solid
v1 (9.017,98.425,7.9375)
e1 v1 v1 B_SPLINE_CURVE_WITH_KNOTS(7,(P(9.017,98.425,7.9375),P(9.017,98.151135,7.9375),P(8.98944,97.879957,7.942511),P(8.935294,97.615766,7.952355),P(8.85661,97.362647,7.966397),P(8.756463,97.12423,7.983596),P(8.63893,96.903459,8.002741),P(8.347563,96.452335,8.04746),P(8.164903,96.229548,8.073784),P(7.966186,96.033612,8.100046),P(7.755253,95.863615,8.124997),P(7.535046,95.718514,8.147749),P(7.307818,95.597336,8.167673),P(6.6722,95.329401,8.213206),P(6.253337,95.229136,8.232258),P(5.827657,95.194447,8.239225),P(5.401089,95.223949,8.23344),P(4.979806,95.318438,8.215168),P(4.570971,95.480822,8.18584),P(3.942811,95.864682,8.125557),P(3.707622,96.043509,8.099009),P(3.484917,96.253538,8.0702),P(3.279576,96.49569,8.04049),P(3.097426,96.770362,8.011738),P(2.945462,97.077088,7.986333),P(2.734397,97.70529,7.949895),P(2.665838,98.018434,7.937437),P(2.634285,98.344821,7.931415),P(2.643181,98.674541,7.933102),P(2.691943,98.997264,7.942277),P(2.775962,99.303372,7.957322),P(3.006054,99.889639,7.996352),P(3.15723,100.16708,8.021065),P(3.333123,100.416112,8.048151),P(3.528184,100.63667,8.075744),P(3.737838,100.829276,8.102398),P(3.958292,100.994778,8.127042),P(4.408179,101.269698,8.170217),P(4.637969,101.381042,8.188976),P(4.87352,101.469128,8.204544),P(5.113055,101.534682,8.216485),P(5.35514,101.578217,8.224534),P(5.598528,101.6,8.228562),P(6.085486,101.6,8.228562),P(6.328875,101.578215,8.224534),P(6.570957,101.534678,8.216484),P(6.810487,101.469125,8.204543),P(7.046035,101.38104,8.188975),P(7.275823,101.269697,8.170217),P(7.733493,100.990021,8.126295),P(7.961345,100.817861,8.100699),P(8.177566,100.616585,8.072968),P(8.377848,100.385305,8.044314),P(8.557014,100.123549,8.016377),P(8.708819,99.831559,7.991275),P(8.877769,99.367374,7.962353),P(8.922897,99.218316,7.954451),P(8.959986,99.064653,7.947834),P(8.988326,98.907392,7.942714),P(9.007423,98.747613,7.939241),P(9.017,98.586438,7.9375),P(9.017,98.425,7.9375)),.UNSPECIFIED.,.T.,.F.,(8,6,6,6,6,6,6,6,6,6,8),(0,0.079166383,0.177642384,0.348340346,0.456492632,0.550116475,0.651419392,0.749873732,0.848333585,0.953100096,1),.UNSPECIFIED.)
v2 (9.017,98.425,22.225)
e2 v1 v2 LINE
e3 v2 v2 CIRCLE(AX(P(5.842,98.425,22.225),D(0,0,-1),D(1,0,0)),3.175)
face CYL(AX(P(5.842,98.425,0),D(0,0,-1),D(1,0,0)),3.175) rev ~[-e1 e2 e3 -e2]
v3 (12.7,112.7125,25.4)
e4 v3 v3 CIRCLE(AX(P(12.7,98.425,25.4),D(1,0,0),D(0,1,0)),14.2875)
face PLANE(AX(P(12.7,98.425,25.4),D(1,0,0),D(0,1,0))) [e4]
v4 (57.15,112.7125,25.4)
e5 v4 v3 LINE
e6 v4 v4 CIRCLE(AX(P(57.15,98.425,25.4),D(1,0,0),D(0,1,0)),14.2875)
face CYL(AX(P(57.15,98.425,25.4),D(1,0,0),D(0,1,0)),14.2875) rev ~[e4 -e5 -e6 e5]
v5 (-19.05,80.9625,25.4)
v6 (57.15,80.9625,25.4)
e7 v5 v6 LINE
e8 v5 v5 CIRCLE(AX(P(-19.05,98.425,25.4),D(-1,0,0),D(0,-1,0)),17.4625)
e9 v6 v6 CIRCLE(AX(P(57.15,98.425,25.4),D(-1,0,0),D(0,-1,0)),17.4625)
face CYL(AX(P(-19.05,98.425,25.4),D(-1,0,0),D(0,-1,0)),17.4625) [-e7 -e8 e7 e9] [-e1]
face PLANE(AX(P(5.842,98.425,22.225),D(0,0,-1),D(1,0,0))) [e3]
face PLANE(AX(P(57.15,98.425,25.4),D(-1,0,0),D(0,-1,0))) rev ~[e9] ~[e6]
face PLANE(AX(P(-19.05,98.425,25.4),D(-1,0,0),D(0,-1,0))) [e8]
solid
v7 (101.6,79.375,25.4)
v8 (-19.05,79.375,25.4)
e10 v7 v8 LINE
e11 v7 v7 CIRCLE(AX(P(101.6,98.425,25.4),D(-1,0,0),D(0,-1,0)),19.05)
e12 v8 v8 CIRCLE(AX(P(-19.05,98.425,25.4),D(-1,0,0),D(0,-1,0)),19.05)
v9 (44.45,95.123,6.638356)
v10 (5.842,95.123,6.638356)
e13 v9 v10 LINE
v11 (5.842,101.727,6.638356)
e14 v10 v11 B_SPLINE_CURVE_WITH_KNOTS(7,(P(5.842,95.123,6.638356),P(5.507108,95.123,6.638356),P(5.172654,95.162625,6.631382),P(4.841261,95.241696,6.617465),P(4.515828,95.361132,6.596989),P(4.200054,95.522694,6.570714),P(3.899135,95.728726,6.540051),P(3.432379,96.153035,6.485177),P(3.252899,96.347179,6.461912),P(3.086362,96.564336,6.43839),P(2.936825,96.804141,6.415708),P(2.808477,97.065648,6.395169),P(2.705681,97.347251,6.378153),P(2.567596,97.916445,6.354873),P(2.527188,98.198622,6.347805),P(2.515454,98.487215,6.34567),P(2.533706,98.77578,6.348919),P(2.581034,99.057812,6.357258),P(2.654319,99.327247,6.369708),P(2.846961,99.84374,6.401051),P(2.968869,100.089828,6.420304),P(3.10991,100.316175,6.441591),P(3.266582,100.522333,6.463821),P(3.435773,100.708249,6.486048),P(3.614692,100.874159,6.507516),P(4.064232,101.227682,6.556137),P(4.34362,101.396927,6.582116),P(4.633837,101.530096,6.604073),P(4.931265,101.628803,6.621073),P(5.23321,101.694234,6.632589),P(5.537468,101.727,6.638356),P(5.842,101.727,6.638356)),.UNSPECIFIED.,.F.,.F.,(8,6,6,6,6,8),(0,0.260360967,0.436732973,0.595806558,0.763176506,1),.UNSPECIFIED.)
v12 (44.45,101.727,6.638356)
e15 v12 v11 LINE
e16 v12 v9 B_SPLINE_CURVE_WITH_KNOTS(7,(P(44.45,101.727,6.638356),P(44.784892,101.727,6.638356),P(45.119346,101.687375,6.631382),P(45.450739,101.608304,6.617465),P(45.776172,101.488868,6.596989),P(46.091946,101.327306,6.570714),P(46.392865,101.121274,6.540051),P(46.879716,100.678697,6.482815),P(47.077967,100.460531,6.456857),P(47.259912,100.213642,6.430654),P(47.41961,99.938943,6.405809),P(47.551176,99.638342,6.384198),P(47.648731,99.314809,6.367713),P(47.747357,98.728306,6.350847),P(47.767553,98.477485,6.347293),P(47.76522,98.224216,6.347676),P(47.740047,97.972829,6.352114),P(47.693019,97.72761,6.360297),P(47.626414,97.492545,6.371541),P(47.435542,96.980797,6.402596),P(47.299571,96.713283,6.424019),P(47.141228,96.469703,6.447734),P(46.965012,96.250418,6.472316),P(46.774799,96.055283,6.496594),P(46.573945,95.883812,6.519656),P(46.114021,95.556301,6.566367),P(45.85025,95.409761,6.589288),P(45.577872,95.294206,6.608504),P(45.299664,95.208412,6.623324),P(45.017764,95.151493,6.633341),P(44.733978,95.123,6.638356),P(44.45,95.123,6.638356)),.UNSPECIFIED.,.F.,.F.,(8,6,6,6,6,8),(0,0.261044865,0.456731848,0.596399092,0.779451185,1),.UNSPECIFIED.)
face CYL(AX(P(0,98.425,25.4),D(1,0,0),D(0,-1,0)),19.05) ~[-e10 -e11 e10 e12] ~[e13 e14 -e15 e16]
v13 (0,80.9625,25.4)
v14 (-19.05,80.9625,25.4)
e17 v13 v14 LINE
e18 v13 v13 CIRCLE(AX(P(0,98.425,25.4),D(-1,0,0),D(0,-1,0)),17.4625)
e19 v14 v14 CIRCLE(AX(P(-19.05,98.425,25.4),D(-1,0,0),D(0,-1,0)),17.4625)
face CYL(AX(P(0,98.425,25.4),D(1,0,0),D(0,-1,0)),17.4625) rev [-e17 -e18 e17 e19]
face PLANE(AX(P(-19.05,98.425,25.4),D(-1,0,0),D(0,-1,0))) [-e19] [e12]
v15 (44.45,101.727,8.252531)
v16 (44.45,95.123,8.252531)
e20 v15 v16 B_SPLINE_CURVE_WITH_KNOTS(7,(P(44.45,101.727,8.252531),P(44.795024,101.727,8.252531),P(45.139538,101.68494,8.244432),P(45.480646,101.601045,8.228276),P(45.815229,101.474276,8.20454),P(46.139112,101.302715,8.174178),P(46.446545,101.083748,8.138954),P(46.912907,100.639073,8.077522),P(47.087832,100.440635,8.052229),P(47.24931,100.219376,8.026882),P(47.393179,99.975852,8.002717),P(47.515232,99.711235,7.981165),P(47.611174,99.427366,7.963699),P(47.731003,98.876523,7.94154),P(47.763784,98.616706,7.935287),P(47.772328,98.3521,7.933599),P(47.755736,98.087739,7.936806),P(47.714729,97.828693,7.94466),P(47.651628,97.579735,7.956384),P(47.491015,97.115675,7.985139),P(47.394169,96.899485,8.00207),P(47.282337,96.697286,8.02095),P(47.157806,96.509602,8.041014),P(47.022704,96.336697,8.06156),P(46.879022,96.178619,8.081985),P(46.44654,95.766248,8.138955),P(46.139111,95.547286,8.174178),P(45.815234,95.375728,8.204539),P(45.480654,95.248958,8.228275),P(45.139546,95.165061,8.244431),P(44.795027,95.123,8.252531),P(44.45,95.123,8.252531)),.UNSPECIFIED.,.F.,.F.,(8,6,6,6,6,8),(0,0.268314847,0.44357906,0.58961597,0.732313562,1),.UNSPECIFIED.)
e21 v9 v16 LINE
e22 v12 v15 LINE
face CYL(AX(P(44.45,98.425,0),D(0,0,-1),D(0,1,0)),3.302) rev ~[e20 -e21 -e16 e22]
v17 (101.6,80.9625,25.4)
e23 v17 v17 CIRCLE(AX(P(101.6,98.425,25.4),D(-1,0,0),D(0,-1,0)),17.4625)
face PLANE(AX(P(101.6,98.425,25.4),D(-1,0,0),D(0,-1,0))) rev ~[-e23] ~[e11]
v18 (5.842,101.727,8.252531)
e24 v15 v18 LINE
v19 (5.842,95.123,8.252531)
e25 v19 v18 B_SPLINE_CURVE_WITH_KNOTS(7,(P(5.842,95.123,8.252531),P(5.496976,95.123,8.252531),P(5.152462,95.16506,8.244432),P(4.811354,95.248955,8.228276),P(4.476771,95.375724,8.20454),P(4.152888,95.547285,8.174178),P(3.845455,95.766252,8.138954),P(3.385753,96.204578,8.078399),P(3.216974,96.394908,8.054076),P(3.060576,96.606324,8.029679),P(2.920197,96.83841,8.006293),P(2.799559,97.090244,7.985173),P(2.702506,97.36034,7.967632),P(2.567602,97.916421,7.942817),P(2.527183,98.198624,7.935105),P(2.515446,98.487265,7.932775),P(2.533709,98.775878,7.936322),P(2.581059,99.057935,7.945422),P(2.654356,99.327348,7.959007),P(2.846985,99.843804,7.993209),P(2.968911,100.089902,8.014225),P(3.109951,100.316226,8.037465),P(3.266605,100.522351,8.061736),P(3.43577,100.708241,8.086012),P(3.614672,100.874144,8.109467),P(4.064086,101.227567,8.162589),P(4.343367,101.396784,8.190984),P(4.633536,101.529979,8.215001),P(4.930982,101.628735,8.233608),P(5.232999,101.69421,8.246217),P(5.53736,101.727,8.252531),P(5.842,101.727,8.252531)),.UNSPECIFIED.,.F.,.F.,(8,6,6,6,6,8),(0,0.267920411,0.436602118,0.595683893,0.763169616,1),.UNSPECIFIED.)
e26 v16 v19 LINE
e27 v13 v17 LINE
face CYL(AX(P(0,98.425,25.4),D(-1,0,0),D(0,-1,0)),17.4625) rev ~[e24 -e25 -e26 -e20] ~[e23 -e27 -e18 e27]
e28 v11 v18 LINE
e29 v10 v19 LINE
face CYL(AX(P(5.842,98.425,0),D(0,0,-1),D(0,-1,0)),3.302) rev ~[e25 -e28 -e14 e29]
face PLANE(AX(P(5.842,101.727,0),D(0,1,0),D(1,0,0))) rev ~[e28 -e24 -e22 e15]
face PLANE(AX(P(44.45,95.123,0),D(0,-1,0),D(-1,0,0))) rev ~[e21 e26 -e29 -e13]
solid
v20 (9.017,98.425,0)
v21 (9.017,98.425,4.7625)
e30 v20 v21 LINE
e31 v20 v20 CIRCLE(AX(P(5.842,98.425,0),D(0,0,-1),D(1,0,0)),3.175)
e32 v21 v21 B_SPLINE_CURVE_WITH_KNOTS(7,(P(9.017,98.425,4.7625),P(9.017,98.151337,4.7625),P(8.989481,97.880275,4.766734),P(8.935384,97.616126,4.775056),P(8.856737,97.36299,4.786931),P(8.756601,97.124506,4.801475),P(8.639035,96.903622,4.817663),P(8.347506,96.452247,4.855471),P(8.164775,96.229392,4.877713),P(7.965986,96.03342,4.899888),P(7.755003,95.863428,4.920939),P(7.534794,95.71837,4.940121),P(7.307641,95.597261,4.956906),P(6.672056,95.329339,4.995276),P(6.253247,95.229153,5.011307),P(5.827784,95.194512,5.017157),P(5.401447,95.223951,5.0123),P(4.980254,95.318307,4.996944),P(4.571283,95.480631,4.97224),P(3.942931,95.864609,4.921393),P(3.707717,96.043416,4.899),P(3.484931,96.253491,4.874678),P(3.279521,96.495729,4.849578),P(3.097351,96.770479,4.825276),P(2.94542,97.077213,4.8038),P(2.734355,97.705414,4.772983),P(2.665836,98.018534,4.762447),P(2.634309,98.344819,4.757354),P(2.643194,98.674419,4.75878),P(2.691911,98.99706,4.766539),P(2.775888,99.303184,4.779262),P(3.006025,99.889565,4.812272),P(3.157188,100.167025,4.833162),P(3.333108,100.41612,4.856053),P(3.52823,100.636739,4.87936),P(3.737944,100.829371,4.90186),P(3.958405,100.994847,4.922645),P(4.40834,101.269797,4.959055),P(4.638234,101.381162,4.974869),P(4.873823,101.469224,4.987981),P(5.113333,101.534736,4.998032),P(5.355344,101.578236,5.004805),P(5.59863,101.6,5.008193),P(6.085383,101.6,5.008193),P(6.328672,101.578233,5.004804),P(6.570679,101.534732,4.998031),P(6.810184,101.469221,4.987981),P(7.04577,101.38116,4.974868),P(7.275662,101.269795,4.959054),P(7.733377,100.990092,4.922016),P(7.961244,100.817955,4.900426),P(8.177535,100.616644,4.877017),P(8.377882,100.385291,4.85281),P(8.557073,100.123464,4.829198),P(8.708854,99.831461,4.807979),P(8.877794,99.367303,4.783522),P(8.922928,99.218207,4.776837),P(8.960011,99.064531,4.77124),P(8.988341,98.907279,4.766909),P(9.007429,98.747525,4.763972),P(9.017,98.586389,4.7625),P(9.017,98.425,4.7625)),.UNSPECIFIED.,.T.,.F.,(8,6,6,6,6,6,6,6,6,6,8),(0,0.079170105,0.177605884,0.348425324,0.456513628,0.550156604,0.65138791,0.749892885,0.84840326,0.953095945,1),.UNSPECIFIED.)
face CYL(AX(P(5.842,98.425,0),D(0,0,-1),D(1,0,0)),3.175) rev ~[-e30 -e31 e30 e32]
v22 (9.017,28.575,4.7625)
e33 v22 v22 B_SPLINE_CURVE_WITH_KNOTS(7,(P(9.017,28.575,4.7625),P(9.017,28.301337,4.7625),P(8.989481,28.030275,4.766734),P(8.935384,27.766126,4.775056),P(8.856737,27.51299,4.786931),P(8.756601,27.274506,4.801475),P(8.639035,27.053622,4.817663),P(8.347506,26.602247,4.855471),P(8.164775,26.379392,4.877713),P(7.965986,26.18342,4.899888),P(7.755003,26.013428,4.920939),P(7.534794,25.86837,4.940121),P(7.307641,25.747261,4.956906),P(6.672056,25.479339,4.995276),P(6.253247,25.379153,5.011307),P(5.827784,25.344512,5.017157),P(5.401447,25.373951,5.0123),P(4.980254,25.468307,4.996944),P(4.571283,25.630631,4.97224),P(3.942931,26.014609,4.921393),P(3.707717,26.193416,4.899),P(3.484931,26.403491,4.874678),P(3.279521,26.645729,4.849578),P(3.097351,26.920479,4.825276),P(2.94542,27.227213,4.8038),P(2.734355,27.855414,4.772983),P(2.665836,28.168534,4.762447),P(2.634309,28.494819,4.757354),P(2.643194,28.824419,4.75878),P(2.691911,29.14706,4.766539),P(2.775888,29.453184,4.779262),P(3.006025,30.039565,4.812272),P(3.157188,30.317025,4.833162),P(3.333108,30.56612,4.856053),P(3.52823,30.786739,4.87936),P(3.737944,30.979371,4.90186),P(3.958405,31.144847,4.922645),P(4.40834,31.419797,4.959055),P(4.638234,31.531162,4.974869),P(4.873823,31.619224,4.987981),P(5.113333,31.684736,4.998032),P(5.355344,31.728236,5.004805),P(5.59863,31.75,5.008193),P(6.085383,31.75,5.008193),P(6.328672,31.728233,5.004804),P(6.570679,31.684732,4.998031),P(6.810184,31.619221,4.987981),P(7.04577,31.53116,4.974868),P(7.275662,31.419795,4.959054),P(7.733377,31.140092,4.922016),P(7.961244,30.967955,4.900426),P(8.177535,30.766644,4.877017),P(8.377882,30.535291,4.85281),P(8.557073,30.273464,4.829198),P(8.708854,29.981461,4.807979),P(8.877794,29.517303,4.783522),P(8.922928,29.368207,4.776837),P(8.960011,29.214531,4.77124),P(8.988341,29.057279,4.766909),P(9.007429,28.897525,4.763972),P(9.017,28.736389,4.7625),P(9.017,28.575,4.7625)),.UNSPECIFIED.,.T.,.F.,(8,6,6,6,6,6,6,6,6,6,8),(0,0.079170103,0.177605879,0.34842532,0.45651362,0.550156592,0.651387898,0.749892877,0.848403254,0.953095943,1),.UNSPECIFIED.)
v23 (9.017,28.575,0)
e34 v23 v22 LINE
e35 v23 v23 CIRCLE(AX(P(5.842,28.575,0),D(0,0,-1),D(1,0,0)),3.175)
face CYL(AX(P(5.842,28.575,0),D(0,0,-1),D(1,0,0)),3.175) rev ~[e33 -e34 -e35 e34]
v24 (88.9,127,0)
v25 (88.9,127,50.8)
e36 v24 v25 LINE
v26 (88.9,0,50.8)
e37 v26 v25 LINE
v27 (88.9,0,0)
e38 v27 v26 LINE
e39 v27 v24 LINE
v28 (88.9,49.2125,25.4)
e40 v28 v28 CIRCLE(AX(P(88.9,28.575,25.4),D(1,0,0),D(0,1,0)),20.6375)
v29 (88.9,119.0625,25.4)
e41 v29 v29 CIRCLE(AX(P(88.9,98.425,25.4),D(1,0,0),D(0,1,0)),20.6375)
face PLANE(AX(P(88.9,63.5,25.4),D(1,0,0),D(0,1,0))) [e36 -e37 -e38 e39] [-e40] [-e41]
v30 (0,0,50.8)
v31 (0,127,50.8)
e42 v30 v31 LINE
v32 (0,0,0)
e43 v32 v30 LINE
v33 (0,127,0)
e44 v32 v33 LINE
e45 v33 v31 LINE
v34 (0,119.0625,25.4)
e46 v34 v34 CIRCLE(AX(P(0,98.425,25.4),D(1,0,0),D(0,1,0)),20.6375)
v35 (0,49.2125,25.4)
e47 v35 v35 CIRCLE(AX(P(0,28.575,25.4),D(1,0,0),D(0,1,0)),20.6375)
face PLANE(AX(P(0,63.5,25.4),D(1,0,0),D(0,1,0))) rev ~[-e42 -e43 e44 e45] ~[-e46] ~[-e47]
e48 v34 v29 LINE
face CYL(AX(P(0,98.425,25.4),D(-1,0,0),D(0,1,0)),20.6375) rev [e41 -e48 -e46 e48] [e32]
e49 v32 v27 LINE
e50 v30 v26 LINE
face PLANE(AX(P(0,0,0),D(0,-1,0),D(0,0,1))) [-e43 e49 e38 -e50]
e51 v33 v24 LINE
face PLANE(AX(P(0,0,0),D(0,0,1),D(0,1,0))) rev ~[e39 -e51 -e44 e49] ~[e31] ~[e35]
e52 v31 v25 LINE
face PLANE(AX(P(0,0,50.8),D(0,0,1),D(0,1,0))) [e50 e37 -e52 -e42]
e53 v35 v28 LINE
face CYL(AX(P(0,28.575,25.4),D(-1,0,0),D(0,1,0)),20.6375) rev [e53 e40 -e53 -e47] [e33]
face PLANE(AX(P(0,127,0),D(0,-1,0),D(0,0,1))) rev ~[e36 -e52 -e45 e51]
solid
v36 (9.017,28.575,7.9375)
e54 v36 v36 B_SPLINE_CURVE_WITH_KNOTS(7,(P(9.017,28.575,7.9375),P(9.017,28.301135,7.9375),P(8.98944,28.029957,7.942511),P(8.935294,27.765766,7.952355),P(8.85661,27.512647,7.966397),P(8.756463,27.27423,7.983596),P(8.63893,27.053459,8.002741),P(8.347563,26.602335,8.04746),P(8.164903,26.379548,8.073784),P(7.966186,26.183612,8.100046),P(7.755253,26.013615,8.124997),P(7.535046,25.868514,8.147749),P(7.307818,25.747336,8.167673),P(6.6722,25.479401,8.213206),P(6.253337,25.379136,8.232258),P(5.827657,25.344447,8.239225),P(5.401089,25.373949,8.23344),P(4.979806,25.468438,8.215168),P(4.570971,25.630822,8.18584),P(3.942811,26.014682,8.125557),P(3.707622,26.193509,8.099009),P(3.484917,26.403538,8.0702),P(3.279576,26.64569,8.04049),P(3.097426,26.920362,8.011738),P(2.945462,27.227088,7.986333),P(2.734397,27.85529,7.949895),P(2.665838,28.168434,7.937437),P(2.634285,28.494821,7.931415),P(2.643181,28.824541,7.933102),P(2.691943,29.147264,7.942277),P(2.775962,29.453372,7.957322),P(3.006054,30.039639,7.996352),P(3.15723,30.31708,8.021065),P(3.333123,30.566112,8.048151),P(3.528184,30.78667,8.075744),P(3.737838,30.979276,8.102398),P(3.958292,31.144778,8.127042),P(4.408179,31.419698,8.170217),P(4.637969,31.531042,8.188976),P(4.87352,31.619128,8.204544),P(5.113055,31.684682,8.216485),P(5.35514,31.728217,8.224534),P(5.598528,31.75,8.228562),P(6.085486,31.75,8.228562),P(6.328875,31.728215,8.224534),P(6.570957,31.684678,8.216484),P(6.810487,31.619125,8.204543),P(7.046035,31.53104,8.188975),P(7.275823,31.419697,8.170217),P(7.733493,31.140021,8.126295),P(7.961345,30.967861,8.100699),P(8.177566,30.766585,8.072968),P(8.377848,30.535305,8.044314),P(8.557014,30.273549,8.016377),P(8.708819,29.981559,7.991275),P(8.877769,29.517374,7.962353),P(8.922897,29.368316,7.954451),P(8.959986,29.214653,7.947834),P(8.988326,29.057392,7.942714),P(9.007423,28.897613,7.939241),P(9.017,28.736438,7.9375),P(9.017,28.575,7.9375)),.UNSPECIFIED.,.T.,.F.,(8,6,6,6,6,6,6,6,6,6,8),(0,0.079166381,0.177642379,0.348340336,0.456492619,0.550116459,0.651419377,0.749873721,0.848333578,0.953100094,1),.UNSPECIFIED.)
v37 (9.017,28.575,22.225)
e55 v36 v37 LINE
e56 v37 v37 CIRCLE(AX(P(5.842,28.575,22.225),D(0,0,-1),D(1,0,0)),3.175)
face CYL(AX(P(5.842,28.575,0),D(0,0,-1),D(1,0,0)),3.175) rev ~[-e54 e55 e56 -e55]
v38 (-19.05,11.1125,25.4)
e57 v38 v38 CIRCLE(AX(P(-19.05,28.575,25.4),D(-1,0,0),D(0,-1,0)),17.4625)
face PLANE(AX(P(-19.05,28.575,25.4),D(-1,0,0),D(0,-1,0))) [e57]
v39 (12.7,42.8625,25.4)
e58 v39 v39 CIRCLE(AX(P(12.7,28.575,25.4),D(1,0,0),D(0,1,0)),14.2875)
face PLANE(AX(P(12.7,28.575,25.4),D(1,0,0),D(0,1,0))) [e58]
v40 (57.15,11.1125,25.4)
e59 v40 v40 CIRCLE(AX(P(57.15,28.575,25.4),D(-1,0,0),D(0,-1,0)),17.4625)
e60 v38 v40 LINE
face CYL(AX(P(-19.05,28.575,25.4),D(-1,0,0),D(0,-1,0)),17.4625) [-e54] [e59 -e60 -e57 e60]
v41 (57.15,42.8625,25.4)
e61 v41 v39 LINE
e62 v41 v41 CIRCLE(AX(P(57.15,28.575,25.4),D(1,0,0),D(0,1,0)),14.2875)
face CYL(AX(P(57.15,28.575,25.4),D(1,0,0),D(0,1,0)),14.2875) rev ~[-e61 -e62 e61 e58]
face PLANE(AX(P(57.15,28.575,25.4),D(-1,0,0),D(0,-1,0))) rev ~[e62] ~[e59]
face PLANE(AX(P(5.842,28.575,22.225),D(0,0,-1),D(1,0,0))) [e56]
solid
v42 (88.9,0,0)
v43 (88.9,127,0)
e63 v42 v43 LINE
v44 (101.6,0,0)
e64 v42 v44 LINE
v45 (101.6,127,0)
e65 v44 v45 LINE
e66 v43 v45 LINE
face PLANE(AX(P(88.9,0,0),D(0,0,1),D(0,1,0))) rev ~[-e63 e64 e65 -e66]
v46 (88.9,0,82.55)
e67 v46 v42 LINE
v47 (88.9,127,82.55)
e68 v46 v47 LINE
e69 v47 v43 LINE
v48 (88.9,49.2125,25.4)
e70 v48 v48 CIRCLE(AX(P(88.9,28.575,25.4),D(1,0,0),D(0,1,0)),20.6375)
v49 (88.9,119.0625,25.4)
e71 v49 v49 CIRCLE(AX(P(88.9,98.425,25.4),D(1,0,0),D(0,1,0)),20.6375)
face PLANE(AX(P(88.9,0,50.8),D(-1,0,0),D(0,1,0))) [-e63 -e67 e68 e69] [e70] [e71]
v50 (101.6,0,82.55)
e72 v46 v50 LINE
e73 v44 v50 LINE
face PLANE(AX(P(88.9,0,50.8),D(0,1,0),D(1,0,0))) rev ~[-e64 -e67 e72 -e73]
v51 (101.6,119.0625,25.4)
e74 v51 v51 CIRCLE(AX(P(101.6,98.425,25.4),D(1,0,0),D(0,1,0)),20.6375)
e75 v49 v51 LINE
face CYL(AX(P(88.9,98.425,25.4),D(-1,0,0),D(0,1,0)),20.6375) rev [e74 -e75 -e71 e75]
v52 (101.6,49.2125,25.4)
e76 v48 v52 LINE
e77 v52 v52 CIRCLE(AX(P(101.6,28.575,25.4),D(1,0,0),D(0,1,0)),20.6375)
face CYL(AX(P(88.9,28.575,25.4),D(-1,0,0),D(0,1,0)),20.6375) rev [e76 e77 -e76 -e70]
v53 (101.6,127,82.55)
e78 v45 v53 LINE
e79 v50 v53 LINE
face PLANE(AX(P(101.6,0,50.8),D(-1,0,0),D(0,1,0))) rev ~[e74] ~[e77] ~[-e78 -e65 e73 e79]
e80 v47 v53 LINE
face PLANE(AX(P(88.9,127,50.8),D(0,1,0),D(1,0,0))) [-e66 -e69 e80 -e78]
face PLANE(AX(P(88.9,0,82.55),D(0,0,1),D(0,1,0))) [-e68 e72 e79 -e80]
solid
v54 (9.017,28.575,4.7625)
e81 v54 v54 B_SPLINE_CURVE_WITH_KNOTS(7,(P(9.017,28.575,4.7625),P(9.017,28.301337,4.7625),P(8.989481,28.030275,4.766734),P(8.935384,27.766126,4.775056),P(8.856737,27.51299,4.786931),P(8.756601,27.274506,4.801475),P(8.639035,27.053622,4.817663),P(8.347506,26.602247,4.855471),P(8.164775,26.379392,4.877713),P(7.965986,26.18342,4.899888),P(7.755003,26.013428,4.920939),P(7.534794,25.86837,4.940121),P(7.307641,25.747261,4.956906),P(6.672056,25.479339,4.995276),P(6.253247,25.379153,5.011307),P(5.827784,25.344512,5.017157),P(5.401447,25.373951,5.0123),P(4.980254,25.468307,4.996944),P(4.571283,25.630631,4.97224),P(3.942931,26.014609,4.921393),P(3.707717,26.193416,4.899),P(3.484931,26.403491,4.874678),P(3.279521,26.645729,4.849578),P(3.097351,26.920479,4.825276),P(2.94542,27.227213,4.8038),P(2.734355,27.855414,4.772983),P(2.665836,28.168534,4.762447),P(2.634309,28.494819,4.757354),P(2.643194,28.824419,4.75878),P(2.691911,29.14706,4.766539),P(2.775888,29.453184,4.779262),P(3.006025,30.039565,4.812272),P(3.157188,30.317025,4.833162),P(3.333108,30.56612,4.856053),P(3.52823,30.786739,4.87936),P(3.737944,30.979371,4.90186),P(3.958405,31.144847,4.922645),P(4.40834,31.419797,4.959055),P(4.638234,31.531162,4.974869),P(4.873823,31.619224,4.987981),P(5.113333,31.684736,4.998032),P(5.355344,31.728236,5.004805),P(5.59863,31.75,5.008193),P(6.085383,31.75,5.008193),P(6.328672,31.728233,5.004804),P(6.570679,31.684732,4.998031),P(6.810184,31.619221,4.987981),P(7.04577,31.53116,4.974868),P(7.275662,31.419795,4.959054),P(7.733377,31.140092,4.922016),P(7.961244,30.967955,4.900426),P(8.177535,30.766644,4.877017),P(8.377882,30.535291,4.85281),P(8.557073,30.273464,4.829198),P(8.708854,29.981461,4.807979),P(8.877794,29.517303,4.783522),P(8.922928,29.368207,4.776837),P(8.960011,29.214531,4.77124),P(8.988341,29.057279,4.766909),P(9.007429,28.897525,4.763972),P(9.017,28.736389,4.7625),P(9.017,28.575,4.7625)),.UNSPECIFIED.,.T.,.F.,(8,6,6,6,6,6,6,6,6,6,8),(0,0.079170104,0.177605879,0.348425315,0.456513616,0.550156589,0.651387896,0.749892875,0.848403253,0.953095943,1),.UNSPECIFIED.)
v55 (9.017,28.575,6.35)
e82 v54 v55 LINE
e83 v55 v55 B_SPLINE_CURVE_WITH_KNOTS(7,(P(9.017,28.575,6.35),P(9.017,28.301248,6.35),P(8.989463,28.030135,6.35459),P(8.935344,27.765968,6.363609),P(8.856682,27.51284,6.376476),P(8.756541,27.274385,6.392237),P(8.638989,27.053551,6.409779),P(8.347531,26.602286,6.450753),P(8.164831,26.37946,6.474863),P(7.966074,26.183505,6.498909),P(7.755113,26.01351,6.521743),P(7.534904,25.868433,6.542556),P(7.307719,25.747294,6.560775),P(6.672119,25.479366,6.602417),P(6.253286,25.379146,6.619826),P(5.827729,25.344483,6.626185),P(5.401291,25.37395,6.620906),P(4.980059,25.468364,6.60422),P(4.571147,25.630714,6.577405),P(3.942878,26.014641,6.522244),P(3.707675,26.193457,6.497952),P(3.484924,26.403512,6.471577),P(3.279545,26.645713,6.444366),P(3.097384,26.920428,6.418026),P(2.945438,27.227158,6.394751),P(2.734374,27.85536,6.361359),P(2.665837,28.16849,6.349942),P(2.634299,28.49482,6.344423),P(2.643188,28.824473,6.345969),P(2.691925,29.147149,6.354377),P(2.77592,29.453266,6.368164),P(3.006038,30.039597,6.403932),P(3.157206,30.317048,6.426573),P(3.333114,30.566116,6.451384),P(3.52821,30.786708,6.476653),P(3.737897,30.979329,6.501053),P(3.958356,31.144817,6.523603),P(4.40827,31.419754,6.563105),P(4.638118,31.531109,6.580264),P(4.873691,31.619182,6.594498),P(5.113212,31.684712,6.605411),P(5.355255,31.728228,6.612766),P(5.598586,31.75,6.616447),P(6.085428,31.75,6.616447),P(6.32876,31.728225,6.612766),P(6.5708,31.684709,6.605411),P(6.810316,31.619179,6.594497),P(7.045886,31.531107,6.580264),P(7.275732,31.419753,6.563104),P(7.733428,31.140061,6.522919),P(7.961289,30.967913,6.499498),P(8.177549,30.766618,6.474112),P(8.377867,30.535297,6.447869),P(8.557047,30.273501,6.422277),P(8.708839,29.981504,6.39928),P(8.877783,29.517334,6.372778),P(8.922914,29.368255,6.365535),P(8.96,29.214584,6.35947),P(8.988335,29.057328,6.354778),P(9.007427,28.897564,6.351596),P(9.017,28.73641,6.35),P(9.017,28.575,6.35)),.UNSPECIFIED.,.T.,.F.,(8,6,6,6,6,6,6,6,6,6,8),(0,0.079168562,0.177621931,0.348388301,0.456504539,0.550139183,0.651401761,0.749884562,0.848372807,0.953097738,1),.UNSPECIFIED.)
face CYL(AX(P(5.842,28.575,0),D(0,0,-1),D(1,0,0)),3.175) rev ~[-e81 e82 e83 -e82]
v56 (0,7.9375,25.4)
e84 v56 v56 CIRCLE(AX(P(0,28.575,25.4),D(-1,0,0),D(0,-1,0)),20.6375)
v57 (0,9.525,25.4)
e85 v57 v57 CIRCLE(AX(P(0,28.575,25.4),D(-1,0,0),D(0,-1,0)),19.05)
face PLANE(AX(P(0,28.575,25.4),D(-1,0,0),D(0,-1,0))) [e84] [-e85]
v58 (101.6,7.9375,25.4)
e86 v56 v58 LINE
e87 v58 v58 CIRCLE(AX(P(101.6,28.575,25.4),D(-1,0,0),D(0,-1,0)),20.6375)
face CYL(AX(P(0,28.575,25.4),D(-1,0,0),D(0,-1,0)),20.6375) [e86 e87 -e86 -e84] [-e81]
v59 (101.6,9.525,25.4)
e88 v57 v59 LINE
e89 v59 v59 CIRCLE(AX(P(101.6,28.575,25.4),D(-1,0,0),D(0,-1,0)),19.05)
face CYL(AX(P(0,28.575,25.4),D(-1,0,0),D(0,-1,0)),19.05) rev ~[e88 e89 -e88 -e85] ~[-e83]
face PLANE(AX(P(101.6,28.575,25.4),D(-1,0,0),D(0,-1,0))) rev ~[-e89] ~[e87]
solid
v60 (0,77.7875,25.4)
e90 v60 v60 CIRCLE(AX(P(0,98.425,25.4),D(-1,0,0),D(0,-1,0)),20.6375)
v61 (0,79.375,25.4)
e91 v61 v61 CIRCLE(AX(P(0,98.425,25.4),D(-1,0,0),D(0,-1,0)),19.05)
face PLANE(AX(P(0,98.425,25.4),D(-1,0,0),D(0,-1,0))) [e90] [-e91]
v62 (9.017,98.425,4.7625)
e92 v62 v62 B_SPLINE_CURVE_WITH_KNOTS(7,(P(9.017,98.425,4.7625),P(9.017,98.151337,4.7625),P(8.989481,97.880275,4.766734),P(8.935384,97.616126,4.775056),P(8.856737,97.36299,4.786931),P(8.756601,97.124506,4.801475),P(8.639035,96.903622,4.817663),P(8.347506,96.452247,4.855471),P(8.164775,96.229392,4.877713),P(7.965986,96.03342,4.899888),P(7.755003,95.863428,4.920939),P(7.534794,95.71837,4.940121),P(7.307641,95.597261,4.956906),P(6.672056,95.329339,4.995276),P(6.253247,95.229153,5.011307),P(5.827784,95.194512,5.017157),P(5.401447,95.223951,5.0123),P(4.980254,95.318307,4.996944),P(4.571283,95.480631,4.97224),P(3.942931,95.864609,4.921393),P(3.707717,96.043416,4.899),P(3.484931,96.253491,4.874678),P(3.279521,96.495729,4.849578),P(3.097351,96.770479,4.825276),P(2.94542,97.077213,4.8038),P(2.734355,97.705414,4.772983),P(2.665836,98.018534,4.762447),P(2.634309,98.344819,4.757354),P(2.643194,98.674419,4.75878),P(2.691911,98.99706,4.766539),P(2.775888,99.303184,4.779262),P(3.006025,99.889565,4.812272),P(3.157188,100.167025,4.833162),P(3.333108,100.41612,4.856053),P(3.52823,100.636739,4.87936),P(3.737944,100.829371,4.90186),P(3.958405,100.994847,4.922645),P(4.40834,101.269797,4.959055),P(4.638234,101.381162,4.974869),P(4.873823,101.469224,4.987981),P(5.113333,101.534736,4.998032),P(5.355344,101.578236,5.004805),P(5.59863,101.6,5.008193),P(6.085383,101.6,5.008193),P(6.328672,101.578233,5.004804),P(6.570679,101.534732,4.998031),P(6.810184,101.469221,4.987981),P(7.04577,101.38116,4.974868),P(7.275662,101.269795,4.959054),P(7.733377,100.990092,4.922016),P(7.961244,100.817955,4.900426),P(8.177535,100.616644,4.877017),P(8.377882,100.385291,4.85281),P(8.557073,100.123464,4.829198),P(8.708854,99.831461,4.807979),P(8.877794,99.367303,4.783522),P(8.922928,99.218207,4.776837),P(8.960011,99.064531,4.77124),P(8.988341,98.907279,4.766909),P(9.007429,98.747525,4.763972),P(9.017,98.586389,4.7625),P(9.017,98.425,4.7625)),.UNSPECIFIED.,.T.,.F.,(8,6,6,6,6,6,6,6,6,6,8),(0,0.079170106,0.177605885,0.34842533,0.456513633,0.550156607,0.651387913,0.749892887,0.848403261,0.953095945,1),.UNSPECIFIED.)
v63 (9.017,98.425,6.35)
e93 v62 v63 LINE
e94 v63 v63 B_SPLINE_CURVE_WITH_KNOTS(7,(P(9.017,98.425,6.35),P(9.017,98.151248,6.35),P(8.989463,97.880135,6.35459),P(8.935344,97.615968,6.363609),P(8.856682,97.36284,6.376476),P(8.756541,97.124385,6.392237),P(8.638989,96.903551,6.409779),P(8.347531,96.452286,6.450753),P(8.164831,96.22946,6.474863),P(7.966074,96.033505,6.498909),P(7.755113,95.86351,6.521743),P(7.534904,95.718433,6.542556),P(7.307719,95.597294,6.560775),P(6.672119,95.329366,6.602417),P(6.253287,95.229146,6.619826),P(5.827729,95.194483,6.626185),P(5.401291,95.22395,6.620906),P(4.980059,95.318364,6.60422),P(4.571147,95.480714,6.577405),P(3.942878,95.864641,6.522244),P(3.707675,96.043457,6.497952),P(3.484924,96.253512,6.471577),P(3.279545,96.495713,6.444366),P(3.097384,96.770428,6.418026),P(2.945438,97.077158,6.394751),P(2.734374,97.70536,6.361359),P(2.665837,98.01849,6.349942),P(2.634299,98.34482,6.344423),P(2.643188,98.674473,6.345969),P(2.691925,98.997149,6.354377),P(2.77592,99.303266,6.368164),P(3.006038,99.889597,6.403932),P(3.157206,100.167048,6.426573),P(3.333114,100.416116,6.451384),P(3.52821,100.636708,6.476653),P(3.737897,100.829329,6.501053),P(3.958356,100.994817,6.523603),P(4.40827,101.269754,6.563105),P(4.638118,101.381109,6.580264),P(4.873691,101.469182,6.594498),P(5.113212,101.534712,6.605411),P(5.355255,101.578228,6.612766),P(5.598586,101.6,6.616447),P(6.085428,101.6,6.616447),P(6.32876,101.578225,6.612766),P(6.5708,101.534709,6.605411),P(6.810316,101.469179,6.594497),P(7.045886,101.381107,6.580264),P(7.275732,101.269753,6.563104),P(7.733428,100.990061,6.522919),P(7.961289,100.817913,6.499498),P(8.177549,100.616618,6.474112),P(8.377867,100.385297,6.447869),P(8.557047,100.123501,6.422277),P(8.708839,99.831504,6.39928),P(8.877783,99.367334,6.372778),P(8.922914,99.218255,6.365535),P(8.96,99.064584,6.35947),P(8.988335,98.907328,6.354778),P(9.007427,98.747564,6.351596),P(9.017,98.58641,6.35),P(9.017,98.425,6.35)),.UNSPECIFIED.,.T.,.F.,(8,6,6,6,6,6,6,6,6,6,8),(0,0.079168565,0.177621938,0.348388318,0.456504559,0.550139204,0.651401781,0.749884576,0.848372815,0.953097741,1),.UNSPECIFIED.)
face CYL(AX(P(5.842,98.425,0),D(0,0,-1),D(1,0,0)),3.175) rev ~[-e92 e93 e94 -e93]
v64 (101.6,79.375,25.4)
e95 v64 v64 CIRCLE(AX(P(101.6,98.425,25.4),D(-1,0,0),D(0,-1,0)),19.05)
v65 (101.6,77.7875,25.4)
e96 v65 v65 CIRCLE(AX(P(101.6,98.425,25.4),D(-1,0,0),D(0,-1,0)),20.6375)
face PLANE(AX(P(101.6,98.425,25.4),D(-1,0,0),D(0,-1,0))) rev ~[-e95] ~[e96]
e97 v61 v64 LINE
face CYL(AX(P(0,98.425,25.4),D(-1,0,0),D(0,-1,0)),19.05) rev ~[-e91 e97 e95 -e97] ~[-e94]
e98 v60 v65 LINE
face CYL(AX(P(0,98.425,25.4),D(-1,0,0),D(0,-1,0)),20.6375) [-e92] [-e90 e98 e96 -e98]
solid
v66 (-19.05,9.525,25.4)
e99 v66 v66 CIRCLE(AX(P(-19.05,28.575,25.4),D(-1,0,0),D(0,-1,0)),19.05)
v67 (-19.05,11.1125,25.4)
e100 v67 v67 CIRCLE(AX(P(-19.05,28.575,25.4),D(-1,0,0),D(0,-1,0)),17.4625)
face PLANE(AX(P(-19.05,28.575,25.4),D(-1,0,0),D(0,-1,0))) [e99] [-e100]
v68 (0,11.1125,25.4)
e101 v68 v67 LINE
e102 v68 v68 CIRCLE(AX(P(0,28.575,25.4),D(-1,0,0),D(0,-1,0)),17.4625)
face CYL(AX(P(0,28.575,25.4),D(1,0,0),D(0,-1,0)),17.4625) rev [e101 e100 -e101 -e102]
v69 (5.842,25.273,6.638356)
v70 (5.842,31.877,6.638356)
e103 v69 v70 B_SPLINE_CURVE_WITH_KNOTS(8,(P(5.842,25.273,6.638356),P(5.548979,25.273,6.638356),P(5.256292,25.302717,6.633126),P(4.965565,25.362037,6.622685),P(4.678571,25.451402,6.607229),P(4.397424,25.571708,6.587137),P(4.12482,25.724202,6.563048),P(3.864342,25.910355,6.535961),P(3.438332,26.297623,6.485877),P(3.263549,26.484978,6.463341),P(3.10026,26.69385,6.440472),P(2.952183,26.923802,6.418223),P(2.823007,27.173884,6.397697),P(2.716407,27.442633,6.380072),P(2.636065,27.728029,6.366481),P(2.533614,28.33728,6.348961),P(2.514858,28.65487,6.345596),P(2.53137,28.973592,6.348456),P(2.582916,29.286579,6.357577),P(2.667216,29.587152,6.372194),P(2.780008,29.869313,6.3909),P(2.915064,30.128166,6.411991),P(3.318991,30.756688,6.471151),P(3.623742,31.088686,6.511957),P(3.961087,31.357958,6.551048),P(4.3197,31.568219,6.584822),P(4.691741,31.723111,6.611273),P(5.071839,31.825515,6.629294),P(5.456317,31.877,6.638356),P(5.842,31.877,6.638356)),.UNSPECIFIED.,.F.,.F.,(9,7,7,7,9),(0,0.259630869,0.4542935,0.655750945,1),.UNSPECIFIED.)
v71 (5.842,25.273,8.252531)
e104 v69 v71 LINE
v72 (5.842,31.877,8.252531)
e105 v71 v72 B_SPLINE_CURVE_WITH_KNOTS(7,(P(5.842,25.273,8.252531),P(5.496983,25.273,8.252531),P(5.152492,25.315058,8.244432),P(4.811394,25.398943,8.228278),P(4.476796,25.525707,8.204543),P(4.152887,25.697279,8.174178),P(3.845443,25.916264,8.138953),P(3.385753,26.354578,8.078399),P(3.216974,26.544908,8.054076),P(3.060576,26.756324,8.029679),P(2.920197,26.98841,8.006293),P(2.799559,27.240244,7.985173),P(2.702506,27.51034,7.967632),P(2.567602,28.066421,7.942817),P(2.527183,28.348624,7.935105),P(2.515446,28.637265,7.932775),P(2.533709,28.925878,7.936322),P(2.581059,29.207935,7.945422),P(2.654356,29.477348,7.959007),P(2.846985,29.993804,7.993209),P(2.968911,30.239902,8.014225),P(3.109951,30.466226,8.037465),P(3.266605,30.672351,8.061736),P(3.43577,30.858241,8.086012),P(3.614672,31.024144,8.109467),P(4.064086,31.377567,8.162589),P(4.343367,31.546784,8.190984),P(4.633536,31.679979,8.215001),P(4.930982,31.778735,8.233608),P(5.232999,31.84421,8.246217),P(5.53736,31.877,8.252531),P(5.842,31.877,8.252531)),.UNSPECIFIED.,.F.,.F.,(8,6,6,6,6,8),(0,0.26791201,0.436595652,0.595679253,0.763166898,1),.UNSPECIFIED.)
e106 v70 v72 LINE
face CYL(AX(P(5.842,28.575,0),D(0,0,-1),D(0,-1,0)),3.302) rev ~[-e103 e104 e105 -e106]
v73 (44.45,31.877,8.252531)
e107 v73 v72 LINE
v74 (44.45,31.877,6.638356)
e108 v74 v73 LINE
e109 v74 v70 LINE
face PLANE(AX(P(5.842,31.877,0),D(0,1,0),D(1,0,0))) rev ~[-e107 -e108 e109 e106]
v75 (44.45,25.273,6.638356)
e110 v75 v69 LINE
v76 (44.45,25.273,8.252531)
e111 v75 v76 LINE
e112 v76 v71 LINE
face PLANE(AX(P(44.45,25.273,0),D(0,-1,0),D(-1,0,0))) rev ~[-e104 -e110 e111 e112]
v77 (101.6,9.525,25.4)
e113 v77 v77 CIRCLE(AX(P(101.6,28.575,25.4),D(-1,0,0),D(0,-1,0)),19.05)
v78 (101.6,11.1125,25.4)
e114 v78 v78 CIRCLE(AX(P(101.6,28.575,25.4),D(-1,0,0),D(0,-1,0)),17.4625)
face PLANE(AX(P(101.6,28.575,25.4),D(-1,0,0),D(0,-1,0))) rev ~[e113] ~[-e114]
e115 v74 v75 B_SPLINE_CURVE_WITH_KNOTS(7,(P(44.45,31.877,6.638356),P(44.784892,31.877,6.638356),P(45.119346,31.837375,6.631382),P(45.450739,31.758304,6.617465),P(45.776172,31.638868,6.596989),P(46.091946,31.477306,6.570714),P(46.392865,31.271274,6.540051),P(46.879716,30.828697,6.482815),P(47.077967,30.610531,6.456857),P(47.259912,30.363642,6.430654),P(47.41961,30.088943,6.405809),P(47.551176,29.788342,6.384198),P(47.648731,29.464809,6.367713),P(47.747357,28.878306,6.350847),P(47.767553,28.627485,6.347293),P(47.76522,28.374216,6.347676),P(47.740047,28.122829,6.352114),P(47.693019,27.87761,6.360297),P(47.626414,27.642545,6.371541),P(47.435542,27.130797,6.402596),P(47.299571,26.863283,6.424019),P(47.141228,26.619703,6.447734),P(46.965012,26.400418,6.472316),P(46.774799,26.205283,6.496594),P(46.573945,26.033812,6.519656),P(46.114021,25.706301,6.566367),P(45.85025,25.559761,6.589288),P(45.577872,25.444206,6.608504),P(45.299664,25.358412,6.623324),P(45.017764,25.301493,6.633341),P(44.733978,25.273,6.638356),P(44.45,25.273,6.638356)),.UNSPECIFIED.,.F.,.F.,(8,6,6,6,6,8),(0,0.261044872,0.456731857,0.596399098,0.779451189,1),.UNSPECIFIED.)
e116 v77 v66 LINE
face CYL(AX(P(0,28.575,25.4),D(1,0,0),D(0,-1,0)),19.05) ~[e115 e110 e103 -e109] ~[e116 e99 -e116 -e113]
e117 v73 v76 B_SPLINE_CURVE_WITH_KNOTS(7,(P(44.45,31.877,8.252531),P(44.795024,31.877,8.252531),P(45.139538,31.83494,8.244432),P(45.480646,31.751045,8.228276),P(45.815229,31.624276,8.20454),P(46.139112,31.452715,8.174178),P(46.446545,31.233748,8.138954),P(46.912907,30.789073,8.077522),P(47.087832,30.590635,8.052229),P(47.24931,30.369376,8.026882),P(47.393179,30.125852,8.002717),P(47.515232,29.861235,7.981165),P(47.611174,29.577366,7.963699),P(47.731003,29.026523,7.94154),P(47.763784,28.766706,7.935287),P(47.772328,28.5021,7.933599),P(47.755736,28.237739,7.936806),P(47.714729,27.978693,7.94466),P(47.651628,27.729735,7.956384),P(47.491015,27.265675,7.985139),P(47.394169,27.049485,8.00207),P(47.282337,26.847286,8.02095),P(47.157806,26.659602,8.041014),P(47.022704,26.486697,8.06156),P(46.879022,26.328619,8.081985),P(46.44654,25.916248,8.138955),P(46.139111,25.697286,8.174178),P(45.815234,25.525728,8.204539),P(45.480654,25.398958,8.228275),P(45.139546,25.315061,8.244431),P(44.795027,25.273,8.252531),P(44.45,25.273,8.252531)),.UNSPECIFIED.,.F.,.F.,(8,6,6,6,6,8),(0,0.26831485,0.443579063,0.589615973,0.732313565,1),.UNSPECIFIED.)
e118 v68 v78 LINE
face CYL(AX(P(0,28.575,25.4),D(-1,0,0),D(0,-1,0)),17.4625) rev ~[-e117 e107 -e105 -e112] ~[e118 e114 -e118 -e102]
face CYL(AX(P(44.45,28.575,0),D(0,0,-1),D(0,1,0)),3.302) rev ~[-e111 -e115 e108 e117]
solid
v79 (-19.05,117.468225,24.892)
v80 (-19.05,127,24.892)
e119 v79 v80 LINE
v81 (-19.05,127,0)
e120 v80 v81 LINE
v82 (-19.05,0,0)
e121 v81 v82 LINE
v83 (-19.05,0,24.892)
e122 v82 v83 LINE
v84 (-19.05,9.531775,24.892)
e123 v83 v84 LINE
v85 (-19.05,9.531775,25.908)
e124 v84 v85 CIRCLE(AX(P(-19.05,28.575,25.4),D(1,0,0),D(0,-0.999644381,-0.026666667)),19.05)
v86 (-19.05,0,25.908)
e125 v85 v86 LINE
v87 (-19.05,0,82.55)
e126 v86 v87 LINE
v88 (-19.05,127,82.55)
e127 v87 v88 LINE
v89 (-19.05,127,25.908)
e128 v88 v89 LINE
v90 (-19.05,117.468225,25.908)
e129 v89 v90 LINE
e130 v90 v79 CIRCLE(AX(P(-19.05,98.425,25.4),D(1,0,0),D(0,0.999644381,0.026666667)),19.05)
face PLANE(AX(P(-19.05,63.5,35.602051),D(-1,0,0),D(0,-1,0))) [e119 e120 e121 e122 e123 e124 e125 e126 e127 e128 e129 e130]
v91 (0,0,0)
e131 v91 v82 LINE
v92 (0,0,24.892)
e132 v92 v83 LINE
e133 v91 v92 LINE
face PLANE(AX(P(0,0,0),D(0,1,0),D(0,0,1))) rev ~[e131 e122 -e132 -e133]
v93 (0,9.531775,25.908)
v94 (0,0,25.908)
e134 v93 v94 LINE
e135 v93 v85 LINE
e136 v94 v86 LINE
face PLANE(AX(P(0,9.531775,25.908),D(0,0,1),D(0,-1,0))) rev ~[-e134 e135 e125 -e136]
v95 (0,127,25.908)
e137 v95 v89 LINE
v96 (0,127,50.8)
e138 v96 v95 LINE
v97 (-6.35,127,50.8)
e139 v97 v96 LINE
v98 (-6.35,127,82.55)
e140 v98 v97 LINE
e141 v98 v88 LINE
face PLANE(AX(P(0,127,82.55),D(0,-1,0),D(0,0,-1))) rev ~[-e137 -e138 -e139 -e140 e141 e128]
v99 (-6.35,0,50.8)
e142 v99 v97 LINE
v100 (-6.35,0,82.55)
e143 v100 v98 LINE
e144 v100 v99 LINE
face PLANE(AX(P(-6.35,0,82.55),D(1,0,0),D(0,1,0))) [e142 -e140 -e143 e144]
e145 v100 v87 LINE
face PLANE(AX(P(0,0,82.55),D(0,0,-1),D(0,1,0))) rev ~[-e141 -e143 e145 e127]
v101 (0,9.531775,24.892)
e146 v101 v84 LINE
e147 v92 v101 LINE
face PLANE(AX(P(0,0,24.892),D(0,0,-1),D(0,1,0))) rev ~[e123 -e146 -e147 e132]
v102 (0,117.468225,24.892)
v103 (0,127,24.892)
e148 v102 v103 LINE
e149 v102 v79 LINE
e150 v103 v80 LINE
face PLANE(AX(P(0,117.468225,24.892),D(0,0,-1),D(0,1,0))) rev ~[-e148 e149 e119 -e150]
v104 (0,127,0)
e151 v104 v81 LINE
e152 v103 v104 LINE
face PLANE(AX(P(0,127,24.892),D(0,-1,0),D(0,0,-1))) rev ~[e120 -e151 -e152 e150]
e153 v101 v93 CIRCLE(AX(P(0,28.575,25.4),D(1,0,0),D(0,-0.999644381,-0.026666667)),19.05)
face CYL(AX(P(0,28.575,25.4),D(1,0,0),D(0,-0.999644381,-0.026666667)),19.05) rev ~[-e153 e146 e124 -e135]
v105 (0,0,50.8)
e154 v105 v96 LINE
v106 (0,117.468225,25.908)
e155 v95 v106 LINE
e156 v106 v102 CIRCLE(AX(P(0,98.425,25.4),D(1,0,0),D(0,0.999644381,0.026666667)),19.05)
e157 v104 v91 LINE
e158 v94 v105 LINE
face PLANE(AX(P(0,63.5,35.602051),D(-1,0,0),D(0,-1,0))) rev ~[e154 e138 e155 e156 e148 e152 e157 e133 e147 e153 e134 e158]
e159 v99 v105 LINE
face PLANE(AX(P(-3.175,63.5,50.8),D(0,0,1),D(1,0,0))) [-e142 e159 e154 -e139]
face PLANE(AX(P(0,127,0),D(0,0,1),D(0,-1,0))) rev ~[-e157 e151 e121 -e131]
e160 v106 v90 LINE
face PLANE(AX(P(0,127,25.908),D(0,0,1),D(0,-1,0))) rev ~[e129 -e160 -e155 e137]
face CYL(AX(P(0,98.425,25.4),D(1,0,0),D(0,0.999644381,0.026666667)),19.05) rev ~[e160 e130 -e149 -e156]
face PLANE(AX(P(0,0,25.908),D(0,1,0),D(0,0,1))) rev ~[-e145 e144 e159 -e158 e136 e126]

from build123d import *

# Parameters (mm, degrees)
F0_W          = 127
F0_H          = 50.8
F0_R          = 20.6375
F1_DEPTH      = 88.9
F2_R          = 20.6375
F2_R_2        = 19.05
F3_DEPTH      = 101.6
F4_DEPTH      = 12.7
F5_DEPTH      = 31.75
F6_R          = 19.05
F6_R_2        = 17.4625
F7_DEPTH      = 101.6
F7_DEPTH_BACK = 19.05
F9_DEPTH      = 19.05
F10_W         = 6.35
F10_H         = 127
F11_DEPTH     = 31.75
F12_R         = 17.4625
F13_DEPTH     = 76.2
F15_DEPTH     = 12.7
F16_R         = 3.175
F17_DEPTH     = 22.225
F18_R         = 14.2875
F19_DEPTH     = 44.45


with BuildPart() as f1:
    # F0 (on Right) → F1 (new body)
    with BuildSketch(Plane.YZ):
        with Locations((63.5, 25.4)):
            Rectangle(F0_W, F0_H)
        with Locations((28.575, 25.4)):
            Circle(F0_R, mode=Mode.SUBTRACT)
        with Locations((98.425, 25.4)):
            Circle(F0_R, mode=Mode.SUBTRACT)
    extrude(amount=F1_DEPTH)


with BuildPart() as f3:
    # F2 (on face) → F3 (new body)
    with BuildSketch(Plane(origin=(0, 0, 0), x_dir=(0, -1, 0), z_dir=(-1, 0, 0))):
        with Locations((-98.425, 25.4)):
            Circle(F2_R)
        with Locations((-98.425, 25.4)):
            Circle(F2_R_2, mode=Mode.SUBTRACT)
    extrude(amount=-F3_DEPTH)


with BuildPart() as f3b:
    # F2 (on face) → F3, piece 2 (new body)
    with BuildSketch(Plane(origin=(0, 0, 0), x_dir=(0, -1, 0), z_dir=(-1, 0, 0))):
        with Locations((-28.575, 25.4)):
            Circle(F2_R)
        with Locations((-28.575, 25.4)):
            Circle(F2_R_2, mode=Mode.SUBTRACT)
    extrude(amount=-F3_DEPTH)


with BuildPart() as f4:
    # F4 (new): a face of the model
    f4_faces = [f1.part.faces().sort_by_distance(p)[0] for p in [
        (88.9, 63.5, 25.4),
    ]]
    extrude(f4_faces, amount=F4_DEPTH)

    # F5 (add): a face of the model
    f5_faces = [f4.faces().sort_by_distance(p)[0] for p in [
        (95.25, 63.5, 50.8),
    ]]
    extrude(f5_faces, amount=F5_DEPTH)


with BuildPart() as f7:
    # F6 (on face) → F7 (new body, two sides)
    with BuildSketch(Plane(origin=(0, 0, 0), x_dir=(0, -1, 0), z_dir=(-1, 0, 0))) as f7_sk:
        with Locations((-98.425, 25.4)):
            Circle(F6_R)
        with Locations((-98.425, 25.4)):
            Circle(F6_R_2, mode=Mode.SUBTRACT)
    extrude(amount=-F7_DEPTH)
    extrude(f7_sk.sketch, amount=F7_DEPTH_BACK)


with BuildPart() as f7b:
    # F6 (on face) → F7, piece 2 (new body, two sides)
    with BuildSketch(Plane(origin=(0, 0, 0), x_dir=(0, -1, 0), z_dir=(-1, 0, 0))) as f7_2_sk:
        with Locations((-28.575, 25.4)):
            Circle(F6_R)
        with Locations((-28.575, 25.4)):
            Circle(F6_R_2, mode=Mode.SUBTRACT)
    extrude(amount=-F7_DEPTH)
    extrude(f7_2_sk.sketch, amount=F7_DEPTH_BACK)


with BuildPart() as f9:
    # F8 (on face) → F9 (new body)
    with BuildSketch(Plane(origin=(0, 0, 0), x_dir=(0, -1, 0), z_dir=(-1, 0, 0))):
        with BuildLine():
            Line((-127, 24.892), (-127, 0))
            Line((-127, 0), (0, 0))
            Line((0, 0), (0, 24.892))
            Line((0, 24.892), (-9.5317745379, 24.892))
            ThreePointArc((-9.5317745379, 24.892), (-47.625, 25.4), (-9.5317745379, 25.908))
            Line((-9.5317745379, 25.908), (0, 25.908))
            Line((0, 25.908), (0, 82.55))
            Line((0, 82.55), (-127, 82.55))
            Line((-127, 82.55), (-127, 25.908))
            Line((-127, 25.908), (-117.4682254621, 25.908))
            ThreePointArc((-117.4682254621, 25.908), (-79.375, 25.4), (-117.4682254621, 24.892))
            Line((-117.4682254621, 24.892), (-127, 24.892))
        make_face()
    extrude(amount=F9_DEPTH)

    # F10 (on face) → F11 (cut)
    with BuildSketch(Plane.XY.offset(82.55)):
        with Locations((-3.175, 63.5)):
            Rectangle(F10_W, F10_H)
    extrude(amount=-F11_DEPTH, mode=Mode.SUBTRACT)


with BuildPart() as f13:
    # F12 (on face) → F13 (new body)
    with BuildSketch(Plane(origin=(-19.05, 0, 0), x_dir=(0, -1, 0), z_dir=(-1, 0, 0))):
        with Locations((-98.425, 25.4)):
            Circle(F12_R)
    extrude(amount=-F13_DEPTH)


with BuildPart() as f13b:
    # F12 (on face) → F13, piece 2 (new body)
    with BuildSketch(Plane(origin=(-19.05, 0, 0), x_dir=(0, -1, 0), z_dir=(-1, 0, 0))):
        with Locations((-28.575, 25.4)):
            Circle(F12_R)
    extrude(amount=-F13_DEPTH)


with BuildPart() as f15_tool:
    # F14 (on face) → F15 (new body)
    with BuildSketch(Plane(origin=(0, 0, 0), x_dir=(1, 0, 0), z_dir=(0, 0, -1))):
        with BuildLine():
            Line((5.842, -31.877), (44.45, -31.877))
            ThreePointArc((44.45, -31.877), (47.752, -28.575), (44.45, -25.273))
            Line((44.45, -25.273), (5.842, -25.273))
            ThreePointArc((5.842, -25.273), (2.54, -28.575), (5.842, -31.877))
        make_face()
        with BuildLine():
            Line((5.842, -101.727), (44.45, -101.727))
            ThreePointArc((44.45, -101.727), (47.752, -98.425), (44.45, -95.123))
            Line((44.45, -95.123), (5.842, -95.123))
            ThreePointArc((5.842, -95.123), (2.54, -98.425), (5.842, -101.727))
        make_face()
    extrude(amount=-F15_DEPTH)


with BuildPart() as f7_1:
    add(f7.part)

    # F15: cut by f15_tool
    add(f15_tool.part, mode=Mode.SUBTRACT)


with BuildPart() as f7b_1:
    add(f7b.part)

    # F15: cut by f15_tool
    add(f15_tool.part, mode=Mode.SUBTRACT)


with BuildPart() as f17_tool:
    # F16 (on face) → F17 (new body)
    with BuildSketch(Plane(origin=(0, 0, 0), x_dir=(1, 0, 0), z_dir=(0, 0, -1))):
        with Locations((5.842, -98.425)):
            Circle(F16_R)
        with Locations((5.842, -28.575)):
            Circle(F16_R)
    extrude(amount=-F17_DEPTH)


with BuildPart() as f1_1:
    add(f1.part)

    # F17: cut by f17_tool
    add(f17_tool.part, mode=Mode.SUBTRACT)


with BuildPart() as f3_1:
    add(f3.part)

    # F17: cut by f17_tool
    add(f17_tool.part, mode=Mode.SUBTRACT)


with BuildPart() as f3b_1:
    add(f3b.part)

    # F17: cut by f17_tool
    add(f17_tool.part, mode=Mode.SUBTRACT)


with BuildPart() as f13_1:
    add(f13.part)

    # F17: cut by f17_tool
    add(f17_tool.part, mode=Mode.SUBTRACT)


with BuildPart() as f13b_1:
    add(f13b.part)

    # F17: cut by f17_tool
    add(f17_tool.part, mode=Mode.SUBTRACT)


with BuildPart() as f19_tool:
    # F18 (on face) → F19 (new body)
    with BuildSketch(Plane.YZ.offset(57.15)):
        with Locations((98.425, 25.4)):
            Circle(F18_R)
        with Locations((28.575, 25.4)):
            Circle(F18_R)
    extrude(amount=-F19_DEPTH)


with BuildPart() as f13_2:
    add(f13_1.part)

    # F19: cut by f19_tool
    add(f19_tool.part, mode=Mode.SUBTRACT)


with BuildPart() as f13b_2:
    add(f13b_1.part)

    # F19: cut by f19_tool
    add(f19_tool.part, mode=Mode.SUBTRACT)


solid = Compound([f4.part, f9.part, f7_1.part, f7b_1.part, f1_1.part, f3_1.part, f3b_1.part, f13_2.part, f13b_2.part])
